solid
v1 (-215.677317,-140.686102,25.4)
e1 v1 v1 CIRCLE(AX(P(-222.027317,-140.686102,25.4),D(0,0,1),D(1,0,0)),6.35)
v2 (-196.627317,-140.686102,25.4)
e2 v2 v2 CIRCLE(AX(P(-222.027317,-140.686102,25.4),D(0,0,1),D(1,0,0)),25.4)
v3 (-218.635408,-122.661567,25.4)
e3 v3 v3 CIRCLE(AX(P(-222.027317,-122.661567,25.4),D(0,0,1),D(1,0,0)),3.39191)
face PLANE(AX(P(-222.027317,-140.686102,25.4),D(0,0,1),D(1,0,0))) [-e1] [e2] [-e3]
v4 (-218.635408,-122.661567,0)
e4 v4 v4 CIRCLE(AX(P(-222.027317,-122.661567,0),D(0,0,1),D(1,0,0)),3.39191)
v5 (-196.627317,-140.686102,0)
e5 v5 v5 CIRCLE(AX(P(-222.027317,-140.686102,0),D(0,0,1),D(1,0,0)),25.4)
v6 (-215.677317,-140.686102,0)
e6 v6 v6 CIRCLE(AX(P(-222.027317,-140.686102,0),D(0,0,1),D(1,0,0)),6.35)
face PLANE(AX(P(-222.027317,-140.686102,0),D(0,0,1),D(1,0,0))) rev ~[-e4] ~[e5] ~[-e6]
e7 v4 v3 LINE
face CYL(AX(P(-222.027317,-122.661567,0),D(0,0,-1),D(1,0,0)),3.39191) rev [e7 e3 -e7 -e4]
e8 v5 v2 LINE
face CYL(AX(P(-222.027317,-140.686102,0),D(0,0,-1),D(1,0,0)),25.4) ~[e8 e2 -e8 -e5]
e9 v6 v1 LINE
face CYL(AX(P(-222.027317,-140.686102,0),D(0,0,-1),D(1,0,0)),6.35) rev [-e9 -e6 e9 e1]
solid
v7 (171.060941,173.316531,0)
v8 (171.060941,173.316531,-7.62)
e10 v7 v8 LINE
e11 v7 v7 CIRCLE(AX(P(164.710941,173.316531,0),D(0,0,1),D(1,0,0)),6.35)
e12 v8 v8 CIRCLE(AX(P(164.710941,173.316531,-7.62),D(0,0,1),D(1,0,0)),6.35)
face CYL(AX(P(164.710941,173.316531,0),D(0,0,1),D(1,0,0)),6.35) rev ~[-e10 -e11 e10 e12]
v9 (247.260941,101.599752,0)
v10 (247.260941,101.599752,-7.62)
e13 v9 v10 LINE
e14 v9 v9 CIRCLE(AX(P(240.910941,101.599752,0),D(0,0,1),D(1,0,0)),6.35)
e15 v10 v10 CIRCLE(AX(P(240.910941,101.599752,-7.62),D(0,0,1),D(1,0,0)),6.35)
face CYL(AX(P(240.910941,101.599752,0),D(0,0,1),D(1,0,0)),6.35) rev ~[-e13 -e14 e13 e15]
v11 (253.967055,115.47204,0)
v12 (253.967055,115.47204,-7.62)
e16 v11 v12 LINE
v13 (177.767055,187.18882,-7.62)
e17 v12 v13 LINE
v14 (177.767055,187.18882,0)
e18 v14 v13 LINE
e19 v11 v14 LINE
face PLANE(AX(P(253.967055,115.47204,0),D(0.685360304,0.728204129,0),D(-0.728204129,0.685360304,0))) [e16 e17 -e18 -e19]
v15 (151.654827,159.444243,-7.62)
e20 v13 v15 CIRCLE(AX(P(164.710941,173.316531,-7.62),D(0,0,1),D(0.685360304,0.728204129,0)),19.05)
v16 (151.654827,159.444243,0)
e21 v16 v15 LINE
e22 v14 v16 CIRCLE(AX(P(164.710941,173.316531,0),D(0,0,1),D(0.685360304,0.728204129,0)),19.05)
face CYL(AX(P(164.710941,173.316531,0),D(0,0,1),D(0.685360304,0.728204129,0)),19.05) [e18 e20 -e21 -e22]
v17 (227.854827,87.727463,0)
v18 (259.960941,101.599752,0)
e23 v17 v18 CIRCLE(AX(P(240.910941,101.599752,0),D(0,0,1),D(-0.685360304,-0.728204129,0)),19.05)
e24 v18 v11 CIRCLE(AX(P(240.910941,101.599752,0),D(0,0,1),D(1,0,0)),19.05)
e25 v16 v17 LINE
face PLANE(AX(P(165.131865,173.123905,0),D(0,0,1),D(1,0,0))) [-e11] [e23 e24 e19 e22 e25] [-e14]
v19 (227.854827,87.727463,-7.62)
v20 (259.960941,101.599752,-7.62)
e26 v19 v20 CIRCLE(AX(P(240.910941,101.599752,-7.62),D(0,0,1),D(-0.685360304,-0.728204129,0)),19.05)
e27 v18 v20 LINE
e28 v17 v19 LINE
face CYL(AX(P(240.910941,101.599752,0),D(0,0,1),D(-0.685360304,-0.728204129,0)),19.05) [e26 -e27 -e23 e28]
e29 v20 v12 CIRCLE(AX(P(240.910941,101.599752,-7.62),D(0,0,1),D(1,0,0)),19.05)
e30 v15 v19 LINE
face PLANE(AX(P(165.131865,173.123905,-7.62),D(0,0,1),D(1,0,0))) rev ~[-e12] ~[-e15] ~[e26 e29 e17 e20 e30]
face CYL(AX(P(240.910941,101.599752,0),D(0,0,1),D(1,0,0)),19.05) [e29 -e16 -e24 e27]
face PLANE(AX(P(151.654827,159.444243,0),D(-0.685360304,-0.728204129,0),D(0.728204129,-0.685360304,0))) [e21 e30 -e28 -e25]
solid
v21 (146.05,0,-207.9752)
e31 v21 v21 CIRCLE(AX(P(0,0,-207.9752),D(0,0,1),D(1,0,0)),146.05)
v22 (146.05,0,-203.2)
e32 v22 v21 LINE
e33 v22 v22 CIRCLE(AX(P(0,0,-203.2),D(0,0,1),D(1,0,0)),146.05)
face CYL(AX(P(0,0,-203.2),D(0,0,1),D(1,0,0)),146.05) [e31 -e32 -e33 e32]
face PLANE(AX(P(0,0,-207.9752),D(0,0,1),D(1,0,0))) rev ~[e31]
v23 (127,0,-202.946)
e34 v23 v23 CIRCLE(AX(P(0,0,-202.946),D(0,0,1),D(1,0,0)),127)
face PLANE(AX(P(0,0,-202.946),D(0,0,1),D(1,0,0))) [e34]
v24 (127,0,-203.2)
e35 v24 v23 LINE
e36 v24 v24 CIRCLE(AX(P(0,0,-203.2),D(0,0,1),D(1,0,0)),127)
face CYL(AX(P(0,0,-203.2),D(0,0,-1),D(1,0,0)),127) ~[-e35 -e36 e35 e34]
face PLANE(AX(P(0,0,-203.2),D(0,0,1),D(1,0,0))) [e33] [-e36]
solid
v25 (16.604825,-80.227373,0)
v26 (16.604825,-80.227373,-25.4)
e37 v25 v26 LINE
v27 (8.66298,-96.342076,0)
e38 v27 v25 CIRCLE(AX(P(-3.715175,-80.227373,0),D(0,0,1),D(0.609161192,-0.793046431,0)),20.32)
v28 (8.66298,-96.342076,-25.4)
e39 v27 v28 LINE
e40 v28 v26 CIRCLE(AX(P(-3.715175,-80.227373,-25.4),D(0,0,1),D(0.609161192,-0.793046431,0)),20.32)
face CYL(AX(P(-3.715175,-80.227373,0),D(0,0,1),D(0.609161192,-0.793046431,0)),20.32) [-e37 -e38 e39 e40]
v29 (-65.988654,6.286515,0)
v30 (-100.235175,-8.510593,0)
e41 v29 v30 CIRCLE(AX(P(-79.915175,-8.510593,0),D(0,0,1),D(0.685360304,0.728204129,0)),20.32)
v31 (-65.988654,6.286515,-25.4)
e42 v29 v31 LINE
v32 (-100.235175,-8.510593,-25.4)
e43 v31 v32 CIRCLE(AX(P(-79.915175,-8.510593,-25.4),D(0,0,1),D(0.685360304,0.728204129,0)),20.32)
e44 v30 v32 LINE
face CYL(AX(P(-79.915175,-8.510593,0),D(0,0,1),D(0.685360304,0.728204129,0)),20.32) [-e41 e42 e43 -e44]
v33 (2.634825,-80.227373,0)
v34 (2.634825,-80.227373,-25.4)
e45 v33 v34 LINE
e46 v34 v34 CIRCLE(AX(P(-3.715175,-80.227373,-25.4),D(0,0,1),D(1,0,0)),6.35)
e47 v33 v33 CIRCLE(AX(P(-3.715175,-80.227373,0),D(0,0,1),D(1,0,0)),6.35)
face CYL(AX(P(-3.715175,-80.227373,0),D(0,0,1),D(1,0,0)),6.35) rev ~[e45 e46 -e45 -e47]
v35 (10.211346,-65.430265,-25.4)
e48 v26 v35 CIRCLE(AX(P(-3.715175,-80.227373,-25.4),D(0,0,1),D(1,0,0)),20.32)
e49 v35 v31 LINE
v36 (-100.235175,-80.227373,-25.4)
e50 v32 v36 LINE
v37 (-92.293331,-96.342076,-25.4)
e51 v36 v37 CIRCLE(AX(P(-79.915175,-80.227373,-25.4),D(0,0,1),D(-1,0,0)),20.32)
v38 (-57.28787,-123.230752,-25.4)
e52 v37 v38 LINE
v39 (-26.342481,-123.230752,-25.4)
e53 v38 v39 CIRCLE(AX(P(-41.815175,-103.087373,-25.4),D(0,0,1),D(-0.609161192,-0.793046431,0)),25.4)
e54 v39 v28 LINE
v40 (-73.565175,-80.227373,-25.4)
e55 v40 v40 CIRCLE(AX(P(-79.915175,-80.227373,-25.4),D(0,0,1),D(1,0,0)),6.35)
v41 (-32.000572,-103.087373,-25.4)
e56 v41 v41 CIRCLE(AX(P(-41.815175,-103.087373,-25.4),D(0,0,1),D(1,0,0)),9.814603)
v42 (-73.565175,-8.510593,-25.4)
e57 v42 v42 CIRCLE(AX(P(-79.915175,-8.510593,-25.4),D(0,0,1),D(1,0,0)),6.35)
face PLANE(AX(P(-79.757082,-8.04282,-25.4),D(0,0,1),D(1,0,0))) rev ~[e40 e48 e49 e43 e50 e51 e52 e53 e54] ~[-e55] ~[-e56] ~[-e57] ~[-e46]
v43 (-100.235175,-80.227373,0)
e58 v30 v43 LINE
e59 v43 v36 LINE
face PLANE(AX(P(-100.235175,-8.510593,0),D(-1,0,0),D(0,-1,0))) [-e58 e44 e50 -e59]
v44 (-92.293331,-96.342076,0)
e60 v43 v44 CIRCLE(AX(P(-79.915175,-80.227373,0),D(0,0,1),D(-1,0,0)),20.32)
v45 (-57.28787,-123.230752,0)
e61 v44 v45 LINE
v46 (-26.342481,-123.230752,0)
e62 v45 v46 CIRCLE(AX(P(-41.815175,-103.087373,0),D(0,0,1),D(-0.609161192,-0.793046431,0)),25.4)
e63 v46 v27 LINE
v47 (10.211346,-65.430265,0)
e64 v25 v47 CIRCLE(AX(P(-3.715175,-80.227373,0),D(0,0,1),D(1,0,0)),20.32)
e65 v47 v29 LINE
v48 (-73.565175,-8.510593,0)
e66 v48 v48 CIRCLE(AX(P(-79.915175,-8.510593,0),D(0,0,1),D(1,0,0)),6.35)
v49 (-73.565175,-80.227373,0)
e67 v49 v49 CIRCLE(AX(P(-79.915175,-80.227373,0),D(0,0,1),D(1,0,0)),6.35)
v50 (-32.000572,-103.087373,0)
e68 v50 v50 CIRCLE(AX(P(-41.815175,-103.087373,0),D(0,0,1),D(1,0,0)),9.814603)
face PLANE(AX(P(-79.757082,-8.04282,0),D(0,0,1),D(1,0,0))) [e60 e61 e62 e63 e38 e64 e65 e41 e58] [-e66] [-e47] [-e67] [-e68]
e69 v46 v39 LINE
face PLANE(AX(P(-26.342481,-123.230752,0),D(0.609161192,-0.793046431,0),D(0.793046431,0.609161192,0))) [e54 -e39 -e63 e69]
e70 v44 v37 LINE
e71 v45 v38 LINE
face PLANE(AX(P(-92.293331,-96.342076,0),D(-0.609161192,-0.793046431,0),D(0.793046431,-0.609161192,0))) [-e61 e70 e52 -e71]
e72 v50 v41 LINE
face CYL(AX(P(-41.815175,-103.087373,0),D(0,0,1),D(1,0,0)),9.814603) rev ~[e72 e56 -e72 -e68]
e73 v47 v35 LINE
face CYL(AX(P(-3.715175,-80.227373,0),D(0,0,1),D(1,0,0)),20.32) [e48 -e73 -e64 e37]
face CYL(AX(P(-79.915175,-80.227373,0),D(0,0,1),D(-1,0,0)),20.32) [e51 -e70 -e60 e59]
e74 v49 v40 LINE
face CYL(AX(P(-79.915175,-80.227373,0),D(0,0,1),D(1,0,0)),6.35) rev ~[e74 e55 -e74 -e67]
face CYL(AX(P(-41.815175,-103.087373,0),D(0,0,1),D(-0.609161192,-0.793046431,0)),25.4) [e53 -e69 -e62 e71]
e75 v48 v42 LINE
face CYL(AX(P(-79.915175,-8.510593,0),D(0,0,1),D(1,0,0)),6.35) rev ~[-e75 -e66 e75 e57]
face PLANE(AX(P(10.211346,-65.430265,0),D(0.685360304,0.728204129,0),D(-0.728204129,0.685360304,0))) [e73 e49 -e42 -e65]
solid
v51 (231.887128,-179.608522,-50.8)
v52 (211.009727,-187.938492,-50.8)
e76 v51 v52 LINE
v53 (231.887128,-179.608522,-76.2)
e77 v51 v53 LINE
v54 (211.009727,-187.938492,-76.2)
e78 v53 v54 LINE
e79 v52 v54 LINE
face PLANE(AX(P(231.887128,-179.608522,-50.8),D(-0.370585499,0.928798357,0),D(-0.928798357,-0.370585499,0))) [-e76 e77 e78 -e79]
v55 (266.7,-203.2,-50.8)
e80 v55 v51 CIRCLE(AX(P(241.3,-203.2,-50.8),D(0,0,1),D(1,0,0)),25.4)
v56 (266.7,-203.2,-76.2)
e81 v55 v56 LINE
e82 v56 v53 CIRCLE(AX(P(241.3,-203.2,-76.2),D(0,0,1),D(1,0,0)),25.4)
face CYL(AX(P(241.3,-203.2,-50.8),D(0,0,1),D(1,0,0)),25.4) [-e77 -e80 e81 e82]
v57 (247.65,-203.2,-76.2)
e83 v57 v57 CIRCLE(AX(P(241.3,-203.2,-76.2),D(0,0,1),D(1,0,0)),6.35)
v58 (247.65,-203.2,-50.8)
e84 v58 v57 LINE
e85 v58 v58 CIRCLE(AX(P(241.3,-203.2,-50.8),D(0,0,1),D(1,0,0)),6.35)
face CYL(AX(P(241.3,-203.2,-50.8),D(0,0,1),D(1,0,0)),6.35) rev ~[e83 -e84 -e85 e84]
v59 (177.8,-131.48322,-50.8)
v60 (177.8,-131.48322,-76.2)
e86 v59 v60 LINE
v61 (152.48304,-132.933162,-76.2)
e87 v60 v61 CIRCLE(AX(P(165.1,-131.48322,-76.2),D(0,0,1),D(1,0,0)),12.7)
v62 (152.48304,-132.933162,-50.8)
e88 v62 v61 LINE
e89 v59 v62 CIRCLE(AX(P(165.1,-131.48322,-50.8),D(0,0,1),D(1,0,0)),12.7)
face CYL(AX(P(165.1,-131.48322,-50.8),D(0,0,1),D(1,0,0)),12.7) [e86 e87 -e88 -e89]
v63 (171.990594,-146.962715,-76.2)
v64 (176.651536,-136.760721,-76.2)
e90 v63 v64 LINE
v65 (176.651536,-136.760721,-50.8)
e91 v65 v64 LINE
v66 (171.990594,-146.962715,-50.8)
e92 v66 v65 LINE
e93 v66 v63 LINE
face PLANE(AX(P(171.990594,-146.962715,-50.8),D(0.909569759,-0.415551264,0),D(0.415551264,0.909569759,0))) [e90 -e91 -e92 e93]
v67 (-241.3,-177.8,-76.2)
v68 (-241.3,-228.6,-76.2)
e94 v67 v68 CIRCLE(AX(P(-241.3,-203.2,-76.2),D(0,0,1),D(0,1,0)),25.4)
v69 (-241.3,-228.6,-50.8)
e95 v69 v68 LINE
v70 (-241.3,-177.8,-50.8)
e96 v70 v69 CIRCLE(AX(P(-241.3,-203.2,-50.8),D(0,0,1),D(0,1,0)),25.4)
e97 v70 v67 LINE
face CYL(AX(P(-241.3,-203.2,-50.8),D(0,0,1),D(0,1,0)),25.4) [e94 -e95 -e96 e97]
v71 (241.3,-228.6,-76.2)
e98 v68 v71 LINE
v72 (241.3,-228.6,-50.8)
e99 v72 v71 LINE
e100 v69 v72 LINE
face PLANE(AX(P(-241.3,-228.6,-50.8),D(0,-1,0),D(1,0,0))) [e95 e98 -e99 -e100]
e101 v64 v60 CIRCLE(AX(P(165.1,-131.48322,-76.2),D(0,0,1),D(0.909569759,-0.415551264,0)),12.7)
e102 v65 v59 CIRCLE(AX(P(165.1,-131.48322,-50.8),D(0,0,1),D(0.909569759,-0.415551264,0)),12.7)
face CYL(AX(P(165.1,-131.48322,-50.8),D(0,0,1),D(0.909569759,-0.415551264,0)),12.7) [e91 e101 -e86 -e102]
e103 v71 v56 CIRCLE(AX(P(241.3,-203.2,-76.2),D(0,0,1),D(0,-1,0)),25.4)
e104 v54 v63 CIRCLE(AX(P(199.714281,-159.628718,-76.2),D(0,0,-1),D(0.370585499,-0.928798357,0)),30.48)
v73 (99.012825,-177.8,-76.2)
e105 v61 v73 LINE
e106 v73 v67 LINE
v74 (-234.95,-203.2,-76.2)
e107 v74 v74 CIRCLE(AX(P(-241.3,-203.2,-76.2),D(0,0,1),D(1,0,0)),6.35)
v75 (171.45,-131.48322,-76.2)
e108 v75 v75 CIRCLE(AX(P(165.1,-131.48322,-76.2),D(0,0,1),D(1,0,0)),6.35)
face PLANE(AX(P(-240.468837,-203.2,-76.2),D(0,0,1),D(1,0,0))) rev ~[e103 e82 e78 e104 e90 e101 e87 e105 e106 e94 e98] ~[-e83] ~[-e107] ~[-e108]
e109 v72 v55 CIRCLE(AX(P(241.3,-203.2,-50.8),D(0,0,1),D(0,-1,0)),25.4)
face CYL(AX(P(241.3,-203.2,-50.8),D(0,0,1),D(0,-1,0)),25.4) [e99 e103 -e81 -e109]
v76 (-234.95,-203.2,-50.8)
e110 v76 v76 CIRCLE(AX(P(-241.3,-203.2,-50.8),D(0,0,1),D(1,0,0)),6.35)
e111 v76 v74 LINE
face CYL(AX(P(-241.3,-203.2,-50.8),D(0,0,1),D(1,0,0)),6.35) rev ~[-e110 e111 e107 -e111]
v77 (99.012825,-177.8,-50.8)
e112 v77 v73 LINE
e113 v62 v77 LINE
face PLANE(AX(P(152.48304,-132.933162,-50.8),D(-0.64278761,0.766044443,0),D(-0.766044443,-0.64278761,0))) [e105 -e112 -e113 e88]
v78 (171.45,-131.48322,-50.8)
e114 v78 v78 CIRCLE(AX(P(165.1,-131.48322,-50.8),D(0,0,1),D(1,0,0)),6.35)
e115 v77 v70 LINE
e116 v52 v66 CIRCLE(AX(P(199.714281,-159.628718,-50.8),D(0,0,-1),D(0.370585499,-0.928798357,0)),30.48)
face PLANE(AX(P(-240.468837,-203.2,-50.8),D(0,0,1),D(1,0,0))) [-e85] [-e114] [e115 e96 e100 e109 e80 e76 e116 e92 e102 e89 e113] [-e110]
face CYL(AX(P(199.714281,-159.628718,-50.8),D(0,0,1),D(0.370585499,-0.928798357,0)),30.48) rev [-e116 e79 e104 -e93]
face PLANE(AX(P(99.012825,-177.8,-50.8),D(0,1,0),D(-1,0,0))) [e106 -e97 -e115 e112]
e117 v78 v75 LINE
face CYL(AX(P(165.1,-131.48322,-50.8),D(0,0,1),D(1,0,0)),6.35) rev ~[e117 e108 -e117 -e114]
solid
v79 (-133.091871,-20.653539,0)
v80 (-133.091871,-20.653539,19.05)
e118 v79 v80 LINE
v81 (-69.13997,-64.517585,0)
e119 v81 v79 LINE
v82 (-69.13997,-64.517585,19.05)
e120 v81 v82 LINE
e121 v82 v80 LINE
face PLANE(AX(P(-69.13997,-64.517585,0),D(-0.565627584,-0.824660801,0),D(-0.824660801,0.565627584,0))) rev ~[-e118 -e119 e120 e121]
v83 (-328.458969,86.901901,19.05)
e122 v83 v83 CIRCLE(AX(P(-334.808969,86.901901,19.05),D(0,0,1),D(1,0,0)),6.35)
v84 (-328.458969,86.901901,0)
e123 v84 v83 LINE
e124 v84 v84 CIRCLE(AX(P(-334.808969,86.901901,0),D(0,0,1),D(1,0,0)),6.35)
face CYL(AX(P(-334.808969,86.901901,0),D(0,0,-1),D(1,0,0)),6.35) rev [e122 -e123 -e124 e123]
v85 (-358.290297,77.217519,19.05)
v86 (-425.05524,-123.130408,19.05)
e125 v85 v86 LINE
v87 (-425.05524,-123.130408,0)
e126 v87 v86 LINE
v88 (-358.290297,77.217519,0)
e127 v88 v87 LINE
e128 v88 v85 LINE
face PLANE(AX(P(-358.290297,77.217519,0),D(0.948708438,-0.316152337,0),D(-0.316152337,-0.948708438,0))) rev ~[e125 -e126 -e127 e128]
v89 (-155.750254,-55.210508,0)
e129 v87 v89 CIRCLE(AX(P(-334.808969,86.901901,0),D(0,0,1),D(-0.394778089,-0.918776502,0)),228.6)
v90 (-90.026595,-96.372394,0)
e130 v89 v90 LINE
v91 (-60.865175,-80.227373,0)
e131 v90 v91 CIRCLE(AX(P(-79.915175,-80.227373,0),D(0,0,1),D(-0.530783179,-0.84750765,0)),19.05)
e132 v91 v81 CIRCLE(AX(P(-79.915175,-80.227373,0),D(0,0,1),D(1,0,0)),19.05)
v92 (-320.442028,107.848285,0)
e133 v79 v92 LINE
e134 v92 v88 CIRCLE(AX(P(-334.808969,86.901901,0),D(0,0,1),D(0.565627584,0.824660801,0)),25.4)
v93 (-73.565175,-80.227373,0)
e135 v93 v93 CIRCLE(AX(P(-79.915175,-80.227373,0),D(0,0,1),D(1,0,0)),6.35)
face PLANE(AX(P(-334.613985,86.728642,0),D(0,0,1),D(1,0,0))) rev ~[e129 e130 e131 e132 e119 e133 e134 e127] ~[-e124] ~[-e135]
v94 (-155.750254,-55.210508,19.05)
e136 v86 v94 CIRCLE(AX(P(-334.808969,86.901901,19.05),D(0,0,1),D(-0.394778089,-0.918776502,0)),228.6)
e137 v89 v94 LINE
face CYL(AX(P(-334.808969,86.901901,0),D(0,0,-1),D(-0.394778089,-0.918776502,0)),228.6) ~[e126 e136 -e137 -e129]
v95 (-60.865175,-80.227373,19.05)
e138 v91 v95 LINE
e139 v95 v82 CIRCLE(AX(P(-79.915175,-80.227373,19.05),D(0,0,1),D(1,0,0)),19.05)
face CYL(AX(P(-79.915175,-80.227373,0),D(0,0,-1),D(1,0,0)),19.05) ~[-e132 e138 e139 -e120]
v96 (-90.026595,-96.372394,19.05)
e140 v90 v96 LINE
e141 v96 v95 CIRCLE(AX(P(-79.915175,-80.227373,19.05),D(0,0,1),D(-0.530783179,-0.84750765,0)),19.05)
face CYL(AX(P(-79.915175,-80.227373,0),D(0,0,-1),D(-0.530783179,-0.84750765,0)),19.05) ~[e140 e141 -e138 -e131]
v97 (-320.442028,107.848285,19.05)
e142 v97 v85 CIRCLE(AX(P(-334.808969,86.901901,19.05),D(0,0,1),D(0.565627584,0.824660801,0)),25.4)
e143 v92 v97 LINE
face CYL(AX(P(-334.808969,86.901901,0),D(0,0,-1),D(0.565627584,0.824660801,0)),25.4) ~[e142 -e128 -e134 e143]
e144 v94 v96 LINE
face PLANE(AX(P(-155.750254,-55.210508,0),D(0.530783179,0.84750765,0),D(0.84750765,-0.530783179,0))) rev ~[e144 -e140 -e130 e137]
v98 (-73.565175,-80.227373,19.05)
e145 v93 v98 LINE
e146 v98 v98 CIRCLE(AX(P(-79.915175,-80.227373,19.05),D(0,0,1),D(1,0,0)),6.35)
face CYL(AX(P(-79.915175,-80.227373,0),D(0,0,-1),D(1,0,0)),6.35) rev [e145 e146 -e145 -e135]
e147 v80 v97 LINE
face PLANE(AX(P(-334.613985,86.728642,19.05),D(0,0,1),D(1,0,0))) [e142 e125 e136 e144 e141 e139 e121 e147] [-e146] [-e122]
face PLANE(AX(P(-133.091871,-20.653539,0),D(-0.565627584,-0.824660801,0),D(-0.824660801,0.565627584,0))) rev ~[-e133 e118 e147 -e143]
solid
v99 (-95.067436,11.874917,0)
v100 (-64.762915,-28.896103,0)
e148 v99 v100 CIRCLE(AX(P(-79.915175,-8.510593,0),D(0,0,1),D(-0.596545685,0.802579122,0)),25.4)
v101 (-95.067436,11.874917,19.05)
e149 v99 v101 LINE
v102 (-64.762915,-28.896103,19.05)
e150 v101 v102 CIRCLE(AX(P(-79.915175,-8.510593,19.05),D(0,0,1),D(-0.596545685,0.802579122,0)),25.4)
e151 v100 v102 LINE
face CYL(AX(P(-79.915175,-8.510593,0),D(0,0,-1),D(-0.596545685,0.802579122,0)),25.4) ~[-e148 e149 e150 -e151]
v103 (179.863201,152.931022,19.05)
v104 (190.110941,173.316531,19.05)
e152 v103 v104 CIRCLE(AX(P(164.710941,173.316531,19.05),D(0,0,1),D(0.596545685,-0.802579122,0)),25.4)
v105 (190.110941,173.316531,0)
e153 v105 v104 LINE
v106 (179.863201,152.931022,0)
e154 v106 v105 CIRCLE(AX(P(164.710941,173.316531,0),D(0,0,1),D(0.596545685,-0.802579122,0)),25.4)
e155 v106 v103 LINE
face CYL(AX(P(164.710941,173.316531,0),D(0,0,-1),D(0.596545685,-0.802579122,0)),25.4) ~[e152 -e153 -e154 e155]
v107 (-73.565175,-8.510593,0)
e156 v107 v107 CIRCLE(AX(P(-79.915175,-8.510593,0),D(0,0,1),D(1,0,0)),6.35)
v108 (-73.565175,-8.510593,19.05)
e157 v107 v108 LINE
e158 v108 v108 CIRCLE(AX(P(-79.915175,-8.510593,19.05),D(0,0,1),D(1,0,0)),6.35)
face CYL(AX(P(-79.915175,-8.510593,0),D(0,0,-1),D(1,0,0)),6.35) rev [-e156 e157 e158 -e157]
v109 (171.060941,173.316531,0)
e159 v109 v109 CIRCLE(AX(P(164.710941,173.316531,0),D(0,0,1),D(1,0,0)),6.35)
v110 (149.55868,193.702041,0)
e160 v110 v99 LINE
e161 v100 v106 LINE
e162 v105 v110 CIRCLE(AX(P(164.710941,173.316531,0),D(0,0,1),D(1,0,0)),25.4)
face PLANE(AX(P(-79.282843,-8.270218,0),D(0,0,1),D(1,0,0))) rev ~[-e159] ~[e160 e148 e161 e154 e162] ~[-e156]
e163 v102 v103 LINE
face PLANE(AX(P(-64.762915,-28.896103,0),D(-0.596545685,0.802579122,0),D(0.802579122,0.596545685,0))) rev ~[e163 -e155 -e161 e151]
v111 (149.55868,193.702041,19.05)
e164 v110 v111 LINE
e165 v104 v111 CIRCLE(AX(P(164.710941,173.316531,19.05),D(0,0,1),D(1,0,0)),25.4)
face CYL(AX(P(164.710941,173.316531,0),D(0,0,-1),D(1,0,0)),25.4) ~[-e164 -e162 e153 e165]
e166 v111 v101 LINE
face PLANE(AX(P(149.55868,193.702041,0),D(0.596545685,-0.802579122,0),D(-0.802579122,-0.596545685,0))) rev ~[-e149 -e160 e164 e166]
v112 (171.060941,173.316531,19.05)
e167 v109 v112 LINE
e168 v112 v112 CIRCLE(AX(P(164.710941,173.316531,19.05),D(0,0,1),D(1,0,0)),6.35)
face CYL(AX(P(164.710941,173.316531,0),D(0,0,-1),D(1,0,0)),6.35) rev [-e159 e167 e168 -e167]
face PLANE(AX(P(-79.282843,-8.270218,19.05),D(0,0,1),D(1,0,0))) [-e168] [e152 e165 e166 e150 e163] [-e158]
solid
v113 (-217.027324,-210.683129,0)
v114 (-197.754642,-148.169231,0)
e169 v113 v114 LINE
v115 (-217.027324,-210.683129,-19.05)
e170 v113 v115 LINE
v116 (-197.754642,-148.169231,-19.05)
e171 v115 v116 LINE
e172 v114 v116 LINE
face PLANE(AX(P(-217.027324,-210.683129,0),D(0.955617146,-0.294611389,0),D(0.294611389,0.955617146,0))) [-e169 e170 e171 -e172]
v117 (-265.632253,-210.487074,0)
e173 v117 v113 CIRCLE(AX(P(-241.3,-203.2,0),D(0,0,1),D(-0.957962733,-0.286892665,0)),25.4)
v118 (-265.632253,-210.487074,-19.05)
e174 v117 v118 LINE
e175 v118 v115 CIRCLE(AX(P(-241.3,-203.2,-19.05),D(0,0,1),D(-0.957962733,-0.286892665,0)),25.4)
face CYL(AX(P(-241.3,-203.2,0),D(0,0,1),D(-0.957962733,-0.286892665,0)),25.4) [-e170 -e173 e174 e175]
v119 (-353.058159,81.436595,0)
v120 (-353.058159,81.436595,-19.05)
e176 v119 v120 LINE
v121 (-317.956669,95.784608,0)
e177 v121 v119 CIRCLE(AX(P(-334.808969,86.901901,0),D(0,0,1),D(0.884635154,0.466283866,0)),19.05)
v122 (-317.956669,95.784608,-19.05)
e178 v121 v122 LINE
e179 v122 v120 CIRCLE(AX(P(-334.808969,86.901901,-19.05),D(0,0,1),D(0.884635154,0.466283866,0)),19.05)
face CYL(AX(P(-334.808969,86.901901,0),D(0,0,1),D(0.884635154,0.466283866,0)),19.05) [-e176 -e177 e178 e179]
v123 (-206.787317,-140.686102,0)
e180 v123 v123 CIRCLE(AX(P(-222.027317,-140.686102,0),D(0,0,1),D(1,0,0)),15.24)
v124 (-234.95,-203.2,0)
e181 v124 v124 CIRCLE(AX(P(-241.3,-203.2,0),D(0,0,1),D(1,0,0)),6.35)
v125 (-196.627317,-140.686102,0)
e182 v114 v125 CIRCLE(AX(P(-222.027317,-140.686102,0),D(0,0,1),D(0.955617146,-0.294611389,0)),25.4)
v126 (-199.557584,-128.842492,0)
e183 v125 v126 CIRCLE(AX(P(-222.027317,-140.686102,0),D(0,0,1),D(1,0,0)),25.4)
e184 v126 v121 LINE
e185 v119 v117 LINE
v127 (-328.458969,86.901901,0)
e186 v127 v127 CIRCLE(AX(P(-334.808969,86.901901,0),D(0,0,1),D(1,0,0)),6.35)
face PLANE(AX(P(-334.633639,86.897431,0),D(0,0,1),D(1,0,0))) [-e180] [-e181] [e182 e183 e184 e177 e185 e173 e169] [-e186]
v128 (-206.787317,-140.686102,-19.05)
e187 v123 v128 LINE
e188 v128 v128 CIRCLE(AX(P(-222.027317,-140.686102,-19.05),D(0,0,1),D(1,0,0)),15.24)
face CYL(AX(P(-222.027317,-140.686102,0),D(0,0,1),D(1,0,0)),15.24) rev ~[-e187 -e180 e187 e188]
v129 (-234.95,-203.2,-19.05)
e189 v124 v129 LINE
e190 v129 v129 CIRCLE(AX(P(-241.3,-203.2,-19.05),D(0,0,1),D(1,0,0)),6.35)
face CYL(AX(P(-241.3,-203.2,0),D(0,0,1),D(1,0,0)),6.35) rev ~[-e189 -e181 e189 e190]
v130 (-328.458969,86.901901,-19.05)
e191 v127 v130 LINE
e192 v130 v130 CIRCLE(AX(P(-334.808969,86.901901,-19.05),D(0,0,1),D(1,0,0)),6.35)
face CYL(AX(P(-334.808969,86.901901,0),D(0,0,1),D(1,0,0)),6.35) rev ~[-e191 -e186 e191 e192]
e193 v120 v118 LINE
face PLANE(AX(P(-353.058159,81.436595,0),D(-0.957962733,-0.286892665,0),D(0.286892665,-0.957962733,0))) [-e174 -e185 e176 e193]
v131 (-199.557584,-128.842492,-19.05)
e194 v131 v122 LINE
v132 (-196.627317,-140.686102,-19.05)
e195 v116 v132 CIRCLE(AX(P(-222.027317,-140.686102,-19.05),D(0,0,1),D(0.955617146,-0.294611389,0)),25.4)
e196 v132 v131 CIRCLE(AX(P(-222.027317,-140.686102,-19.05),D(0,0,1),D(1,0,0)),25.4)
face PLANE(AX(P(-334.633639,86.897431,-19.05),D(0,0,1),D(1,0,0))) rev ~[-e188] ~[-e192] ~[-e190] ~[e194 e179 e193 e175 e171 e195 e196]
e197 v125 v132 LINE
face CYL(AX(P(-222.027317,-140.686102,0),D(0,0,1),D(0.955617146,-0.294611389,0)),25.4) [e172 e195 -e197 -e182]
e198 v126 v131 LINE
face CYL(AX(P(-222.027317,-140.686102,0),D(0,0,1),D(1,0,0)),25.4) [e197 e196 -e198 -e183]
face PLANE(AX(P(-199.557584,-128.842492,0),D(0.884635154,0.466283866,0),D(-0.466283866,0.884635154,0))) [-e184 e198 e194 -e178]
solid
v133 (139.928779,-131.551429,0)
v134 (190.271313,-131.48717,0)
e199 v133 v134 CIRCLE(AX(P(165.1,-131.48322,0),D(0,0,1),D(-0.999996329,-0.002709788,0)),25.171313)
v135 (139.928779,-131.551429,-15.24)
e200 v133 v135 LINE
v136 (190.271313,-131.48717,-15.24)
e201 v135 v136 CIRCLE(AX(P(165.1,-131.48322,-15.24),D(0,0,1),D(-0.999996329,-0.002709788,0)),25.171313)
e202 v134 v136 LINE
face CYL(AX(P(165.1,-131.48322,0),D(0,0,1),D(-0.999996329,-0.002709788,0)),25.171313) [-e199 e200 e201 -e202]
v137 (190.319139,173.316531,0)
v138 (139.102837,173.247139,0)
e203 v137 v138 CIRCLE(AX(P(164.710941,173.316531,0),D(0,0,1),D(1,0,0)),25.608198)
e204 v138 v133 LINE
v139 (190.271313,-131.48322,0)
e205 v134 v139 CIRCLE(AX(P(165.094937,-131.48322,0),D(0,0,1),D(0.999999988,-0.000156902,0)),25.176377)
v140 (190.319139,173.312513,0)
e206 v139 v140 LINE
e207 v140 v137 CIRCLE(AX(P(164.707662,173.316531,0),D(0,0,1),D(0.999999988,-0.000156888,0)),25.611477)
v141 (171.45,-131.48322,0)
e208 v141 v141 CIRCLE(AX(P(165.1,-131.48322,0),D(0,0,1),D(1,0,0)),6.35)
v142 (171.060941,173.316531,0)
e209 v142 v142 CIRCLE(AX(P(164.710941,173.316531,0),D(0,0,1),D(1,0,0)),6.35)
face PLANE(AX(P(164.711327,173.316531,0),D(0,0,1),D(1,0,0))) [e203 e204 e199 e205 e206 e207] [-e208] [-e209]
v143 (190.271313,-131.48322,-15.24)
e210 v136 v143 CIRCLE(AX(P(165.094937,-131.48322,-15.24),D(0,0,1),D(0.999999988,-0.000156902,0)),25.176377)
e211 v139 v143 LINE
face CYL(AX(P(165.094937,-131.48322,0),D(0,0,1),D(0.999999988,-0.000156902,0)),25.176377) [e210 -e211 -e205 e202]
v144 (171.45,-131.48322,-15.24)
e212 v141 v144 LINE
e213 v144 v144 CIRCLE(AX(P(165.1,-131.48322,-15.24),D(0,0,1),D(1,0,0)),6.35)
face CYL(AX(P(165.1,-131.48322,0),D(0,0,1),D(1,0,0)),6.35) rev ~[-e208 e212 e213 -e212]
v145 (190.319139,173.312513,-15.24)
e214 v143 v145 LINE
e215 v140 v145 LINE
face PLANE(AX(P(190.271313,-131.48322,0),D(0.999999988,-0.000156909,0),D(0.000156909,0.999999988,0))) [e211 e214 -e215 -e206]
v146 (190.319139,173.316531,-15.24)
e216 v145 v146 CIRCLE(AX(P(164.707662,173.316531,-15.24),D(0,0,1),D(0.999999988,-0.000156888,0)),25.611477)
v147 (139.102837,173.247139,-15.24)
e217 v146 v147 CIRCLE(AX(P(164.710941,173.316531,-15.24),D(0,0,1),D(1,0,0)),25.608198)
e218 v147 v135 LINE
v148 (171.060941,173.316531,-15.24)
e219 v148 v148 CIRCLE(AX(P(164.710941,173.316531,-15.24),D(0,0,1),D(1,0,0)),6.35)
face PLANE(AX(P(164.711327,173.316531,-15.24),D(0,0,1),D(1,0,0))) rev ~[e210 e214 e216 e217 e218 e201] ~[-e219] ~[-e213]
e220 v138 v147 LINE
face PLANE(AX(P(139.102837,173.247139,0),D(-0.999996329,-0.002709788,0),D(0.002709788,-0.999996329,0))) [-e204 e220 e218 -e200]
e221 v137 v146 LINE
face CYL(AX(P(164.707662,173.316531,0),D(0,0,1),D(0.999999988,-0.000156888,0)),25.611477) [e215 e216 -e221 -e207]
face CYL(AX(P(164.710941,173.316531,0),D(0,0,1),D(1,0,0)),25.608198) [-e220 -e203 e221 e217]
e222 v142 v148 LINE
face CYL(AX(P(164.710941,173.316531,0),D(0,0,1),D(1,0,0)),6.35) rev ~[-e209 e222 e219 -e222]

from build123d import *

# Parameters (mm, degrees)
F1_R      = 6.35
F2_DEPTH  = 19.05
F3_R      = 6.35
F3_R_2    = 15.24
F4_DEPTH  = 19.05
F5_R      = 25.4
F5_R_2    = 3.391909558
F5_R_3    = 6.35
F6_DEPTH  = 25.4
F7_R      = 6.35
F7_R_2    = 9.8146033801
F8_DEPTH  = 25.4
F10_R     = 6.35
F11_DEPTH = 25.4
F12_R     = 6.35
F13_DEPTH = 19.05
F14_R     = 6.35
F15_DEPTH = 15.24
F16_R     = 6.35
F17_DEPTH = 7.62
F19_R     = 146.05
F19_R_2   = 127
F20_DEPTH = 4.7752
F21_DEPTH = 0.254


# Not quite as in the source:
# - ends of sketch curves that miss each other by under 0.0002 mm in the source are joined


with BuildPart() as f2:
    # F1 (on Top) → F2 (new body)
    with BuildSketch(Plane.XY):
        with BuildLine():
            ThreePointArc((-348.2908615979, 65.3752063053), (-322.5061251941, 64.6802886665), (-309.4089688568, 86.90190062))
            ThreePointArc((-309.4089688568, 86.90190062), (-312.3358705821, 98.7391238559), (-320.4420282219, 107.848284957))
            ThreePointArc((-320.4420282219, 107.848284957), (-350.787985368, 106.6460397842), (-358.2902966075, 77.2175190155))
            ThreePointArc((-358.2902966075, 77.2175190155), (-354.2159266262, 70.5150159211), (-348.2908615979, 65.3752063053))
        make_face()
        with Locations((-334.8089688568, 86.90190062)):
            Circle(F1_R, mode=Mode.SUBTRACT)
        with BuildLine():
            ThreePointArc((-320.4420282219, 107.848284957), (-312.3358705821, 98.7391238559), (-309.4089688568, 86.90190062))
            ThreePointArc((-309.4089688568, 86.90190062), (-322.5061251941, 64.6802886665), (-348.2908615979, 65.3752063053))
            Line((-348.2908615979, 65.3752063053), (-155.7502543241, -55.2105082327))
            ThreePointArc((-155.7502543241, -55.2105082327), (-143.6386238017, -38.4450545545), (-133.0918711804, -20.6535385963))
            Line((-133.0918711804, -20.6535385963), (-320.4420282219, 107.848284957))
        make_face()
        with BuildLine():
            Line((-69.1399699738, -64.5175846932), (-133.0918711804, -20.6535385963))
            ThreePointArc((-133.0918711804, -20.6535385963), (-143.6386238017, -38.4450545545), (-155.7502543241, -55.2105082327))
            Line((-155.7502543241, -55.2105082327), (-90.0265950058, -96.372393682))
            ThreePointArc((-90.0265950058, -96.372393682), (-95.8460375379, -69.7817933481), (-69.1399699738, -64.5175846932))
        make_face()
        with BuildLine():
            ThreePointArc((-60.86517545, -80.227372946), (-63.060351744, -71.3494555191), (-69.1399699738, -64.5175846932))
            ThreePointArc((-69.1399699738, -64.5175846932), (-95.8460375379, -69.7817933481), (-90.0265950058, -96.372393682))
            ThreePointArc((-90.0265950058, -96.372393682), (-70.688042703, -96.8935819111), (-60.86517545, -80.227372946))
        make_face()
        with Locations((-79.91517545, -80.227372946)):
            Circle(F1_R, mode=Mode.SUBTRACT)
        with BuildLine():
            Line((-155.7502543241, -55.2105082327), (-348.2908615979, 65.3752063053))
            ThreePointArc((-348.2908615979, 65.3752063053), (-354.2159266262, 70.5150159211), (-358.2902966075, 77.2175190155))
            Line((-358.2902966075, 77.2175190155), (-425.0552400863, -123.1304076784))
            ThreePointArc((-425.0552400863, -123.1304076784), (-278.9055637141, -134.7572279839), (-155.7502543241, -55.2105082327))
        make_face()
    extrude(amount=F2_DEPTH)


with BuildPart() as f4:
    # F3 (on Top) → F4 (new body)
    with BuildSketch(Plane.XY):
        with BuildLine():
            ThreePointArc((-353.0581589295, 81.4365953504), (-332.0471371173, 68.0531663006), (-315.7589688568, 86.90190062))
            ThreePointArc((-315.7589688568, 86.90190062), (-316.3165540739, 91.4771706117), (-317.9566691714, 95.7846082767))
            ThreePointArc((-317.9566691714, 95.7846082767), (-342.0168946626, 104.5356269868), (-353.0581589295, 81.4365953504))
        make_face()
        with Locations((-334.8089688568, 86.90190062)):
            Circle(F3_R, mode=Mode.SUBTRACT)
        with BuildLine():
            ThreePointArc((-317.9566691714, 95.7846082767), (-316.3165540739, 91.4771706117), (-315.7589688568, 86.90190062))
            ThreePointArc((-315.7589688568, 86.90190062), (-332.0471371173, 68.0531663006), (-353.0581589295, 81.4365953504))
            Line((-353.0581589295, 81.4365953504), (-265.6322534303, -210.4870736928))
            ThreePointArc((-265.6322534303, -210.4870736928), (-244.9824423193, -178.0683542408), (-215.9, -203.2))
            ThreePointArc((-215.9, -203.2), (-216.1834122755, -206.9837839628), (-217.0273244943, -210.6831292782))
            Line((-217.0273244943, -210.6831292782), (-197.7546415567, -148.1692314583))
            ThreePointArc((-197.7546415567, -148.1692314583), (-247.3175108343, -143.0453603229), (-199.5575841486, -128.8424919711))
            Line((-199.5575841486, -128.8424919711), (-317.9566691714, 95.7846082767))
        make_face()
        with BuildLine():
            ThreePointArc((-196.6273170625, -140.6861021801), (-197.3707640186, -134.5857421912), (-199.5575841486, -128.8424919711))
            ThreePointArc((-199.5575841486, -128.8424919711), (-247.3175108343, -143.0453603229), (-197.7546415567, -148.1692314583))
            ThreePointArc((-197.7546415567, -148.1692314583), (-196.9107293379, -144.4698861429), (-196.6273170625, -140.6861021801))
        make_face()
        with Locations((-222.0273170625, -140.6861021801)):
            Circle(F3_R_2, mode=Mode.SUBTRACT)
        with BuildLine():
            ThreePointArc((-215.9, -203.2), (-244.9824423193, -178.0683542408), (-265.6322534303, -210.4870736928))
            ThreePointArc((-265.6322534303, -210.4870736928), (-241.4024540405, -228.5997933686), (-217.0273244943, -210.6831292782))
            ThreePointArc((-217.0273244943, -210.6831292782), (-216.1834122755, -206.9837839628), (-215.9, -203.2))
        make_face()
        with Locations((-241.3, -203.2)):
            Circle(F3_R, mode=Mode.SUBTRACT)
    extrude(amount=-F4_DEPTH)


with BuildPart() as f6:
    # F5 (on Top) → F6 (new body)
    with BuildSketch(Plane.XY):
        with Locations((-222.0273170625, -140.6861021801)):
            Circle(F5_R)
        with Locations((-222.0273170625, -122.6615665425)):
            Circle(F5_R_2, mode=Mode.SUBTRACT)
        with Locations((-222.0273170625, -140.6861021801)):
            Circle(F5_R_3, mode=Mode.SUBTRACT)
    extrude(amount=F6_DEPTH)


with BuildPart() as f8:
    # F7 (on Top) → F8 (new body)
    with BuildSketch(Plane.XY):
        with BuildLine():
            ThreePointArc((-100.23517545, -8.5105931449), (-79.91517545, -28.8305931449), (-59.59517545, -8.5105931449))
            ThreePointArc((-59.59517545, -8.5105931449), (-61.2619007451, -0.4509565039), (-65.9886540706, 6.2865147573))
            ThreePointArc((-65.9886540706, 6.2865147573), (-87.974812091, 10.14268156), (-100.23517545, -8.5105931449))
        make_face()
        with Locations((-79.91517545, -8.5105931449)):
            Circle(F7_R, mode=Mode.SUBTRACT)
        with BuildLine():
            ThreePointArc((-65.9886540706, 6.2865147573), (-61.2619007451, -0.4509565039), (-59.59517545, -8.5105931449))
            ThreePointArc((-59.59517545, -8.5105931449), (-79.91517545, -28.8305931449), (-100.23517545, -8.5105931449))
            Line((-100.23517545, -8.5105931449), (-100.23517545, -80.227372946))
            ThreePointArc((-100.23517545, -80.227372946), (-79.91517545, -59.907372946), (-59.59517545, -80.227372946))
            ThreePointArc((-59.59517545, -80.227372946), (-59.7853586301, -83.0009761617), (-60.3523481664, -85.7226608066))
            ThreePointArc((-60.3523481664, -85.7226608066), (-41.81517545, -77.687372946), (-23.2780027336, -85.7226608066))
            ThreePointArc((-23.2780027336, -85.7226608066), (-14.2454801707, -62.8487918045), (10.2113459294, -65.4302650438))
            Line((10.2113459294, -65.4302650438), (-65.9886540706, 6.2865147573))
        make_face()
        with BuildLine():
            ThreePointArc((-65.8603556748, -94.9026733207), (-78.8102903137, -100.5173120498), (-92.2933308728, -96.3420764285))
            Line((-92.2933308728, -96.3420764285), (-57.2878697285, -123.2307522991))
            ThreePointArc((-57.2878697285, -123.2307522991), (-66.1263995238, -110.4443005678), (-65.8603556748, -94.9026733207))
        make_face()
        with BuildLine():
            ThreePointArc((-59.59517545, -80.227372946), (-79.91517545, -59.907372946), (-100.23517545, -80.227372946))
            ThreePointArc((-100.23517545, -80.227372946), (-98.1418937255, -89.2100863948), (-92.2933308728, -96.3420764285))
            ThreePointArc((-92.2933308728, -96.3420764285), (-78.8102903137, -100.5173120498), (-65.8603556748, -94.9026733207))
            ThreePointArc((-65.8603556748, -94.9026733207), (-63.5954957631, -90.0191807581), (-60.3523481664, -85.7226608066))
            ThreePointArc((-60.3523481664, -85.7226608066), (-59.7853586301, -83.0009761617), (-59.59517545, -80.227372946))
        make_face()
        with Locations((-79.91517545, -80.227372946)):
            Circle(F7_R, mode=Mode.SUBTRACT)
        with BuildLine():
            ThreePointArc((-17.7699952252, -94.9026733207), (-21.1394317005, -90.6819266963), (-23.2780027336, -85.7226608066))
            ThreePointArc((-23.2780027336, -85.7226608066), (-41.81517545, -77.687372946), (-60.3523481664, -85.7226608066))
            ThreePointArc((-60.3523481664, -85.7226608066), (-62.4909191995, -90.6819266963), (-65.8603556748, -94.9026733207))
            ThreePointArc((-65.8603556748, -94.9026733207), (-66.1263995238, -110.4443005678), (-57.2878697285, -123.2307522991))
            ThreePointArc((-57.2878697285, -123.2307522991), (-41.81517545, -128.487372946), (-26.3424811715, -123.2307522991))
            ThreePointArc((-26.3424811715, -123.2307522991), (-19.0317776056, -114.3157647571), (-16.41517545, -103.087372946))
            ThreePointArc((-16.41517545, -103.087372946), (-16.7561693074, -98.9393359229), (-17.7699952252, -94.9026733207))
        make_face()
        with Locations((-41.81517545, -103.087372946)):
            Circle(F7_R_2, mode=Mode.SUBTRACT)
        with BuildLine():
            ThreePointArc((-65.8603556748, -94.9026733207), (-62.4909191995, -90.6819266963), (-60.3523481664, -85.7226608066))
            ThreePointArc((-60.3523481664, -85.7226608066), (-63.5954957631, -90.0191807581), (-65.8603556748, -94.9026733207))
        make_face()
        with BuildLine():
            ThreePointArc((-17.7699952252, -94.9026733207), (-20.0348551369, -90.0191807581), (-23.2780027336, -85.7226608066))
            ThreePointArc((-23.2780027336, -85.7226608066), (-21.1394317005, -90.6819266963), (-17.7699952252, -94.9026733207))
        make_face()
        with BuildLine():
            ThreePointArc((16.60482455, -80.227372946), (14.9380992549, -72.167736305), (10.2113459294, -65.4302650438))
            ThreePointArc((10.2113459294, -65.4302650438), (-14.2454801707, -62.8487918045), (-23.2780027336, -85.7226608066))
            ThreePointArc((-23.2780027336, -85.7226608066), (-20.0348551369, -90.0191807581), (-17.7699952252, -94.9026733207))
            ThreePointArc((-17.7699952252, -94.9026733207), (-4.8200605863, -100.5173120498), (8.6629799728, -96.3420764285))
            ThreePointArc((8.6629799728, -96.3420764285), (14.5115428255, -89.2100863948), (16.60482455, -80.227372946))
        make_face()
        with Locations((-3.71517545, -80.227372946)):
            Circle(F7_R, mode=Mode.SUBTRACT)
        with BuildLine():
            Line((-26.3424811715, -123.2307522991), (8.6629799728, -96.3420764285))
            ThreePointArc((8.6629799728, -96.3420764285), (-4.8200605863, -100.5173120498), (-17.7699952252, -94.9026733207))
            ThreePointArc((-17.7699952252, -94.9026733207), (-16.7561693074, -98.9393359229), (-16.41517545, -103.087372946))
            ThreePointArc((-16.41517545, -103.087372946), (-19.0317776056, -114.3157647571), (-26.3424811715, -123.2307522991))
        make_face()
    extrude(amount=-F8_DEPTH)


with BuildPart() as f11:
    # F10 (on offset) → F11 (new body)
    with BuildSketch(Plane.XY.offset(-50.8)):
        with BuildLine():
            ThreePointArc((-241.3, -228.6), (-223.3394877579, -221.1605122421), (-215.9, -203.2))
            ThreePointArc((-215.9, -203.2), (-223.3394877579, -185.2394877579), (-241.3, -177.8))
            ThreePointArc((-241.3, -177.8), (-266.7, -203.2), (-241.3, -228.6))
        make_face()
        with Locations((-241.3, -203.2)):
            Circle(F10_R, mode=Mode.SUBTRACT)
        with BuildLine():
            ThreePointArc((-241.3, -177.8), (-223.3394877579, -185.2394877579), (-215.9, -203.2))
            ThreePointArc((-215.9, -203.2), (-223.3394877579, -221.1605122421), (-241.3, -228.6))
            Line((-241.3, -228.6), (241.3, -228.6))
            ThreePointArc((241.3, -228.6), (216.3562277503, -207.9925177054), (231.8871283349, -179.6085217289))
            Line((231.8871283349, -179.6085217289), (211.0097267055, -187.9384915587))
            ThreePointArc((211.0097267055, -187.9384915587), (177.641099394, -180.6478771481), (171.9905944387, -146.9627151196))
            Line((171.9905944387, -146.9627151196), (176.6515359453, -136.7607212463))
            ThreePointArc((176.6515359453, -136.7607212463), (163.11346164, -144.0268905287), (152.4830404112, -132.9331618302))
            Line((152.4830404112, -132.9331618302), (99.012824834, -177.8))
            Line((99.012824834, -177.8), (-241.3, -177.8))
        make_face()
        with BuildLine():
            ThreePointArc((177.8, -131.4832201989), (164.3738411943, -118.8039972973), (152.4830404112, -132.9331618302))
            ThreePointArc((152.4830404112, -132.9331618302), (163.11346164, -144.0268905287), (176.6515359453, -136.7607212463))
            ThreePointArc((176.6515359453, -136.7607212463), (177.5095629759, -134.1837288079), (177.8, -131.4832201989))
        make_face()
        with Locations((165.1, -131.4832201989)):
            Circle(F10_R, mode=Mode.SUBTRACT)
        with BuildLine():
            ThreePointArc((231.8871283349, -179.6085217289), (216.3562277503, -207.9925177054), (241.3, -228.6))
            ThreePointArc((241.3, -228.6), (259.2605122421, -221.1605122421), (266.7, -203.2))
            ThreePointArc((266.7, -203.2), (255.5490887376, -182.1732677254), (231.8871283349, -179.6085217289))
        make_face()
        with Locations((241.3, -203.2)):
            Circle(F10_R, mode=Mode.SUBTRACT)
    extrude(amount=-F11_DEPTH)


with BuildPart() as f13:
    # F12 (on Top) → F13 (new body)
    with BuildSketch(Plane.XY):
        with BuildLine():
            ThreePointArc((-64.7629150633, -28.8961028313), (-57.2212620169, -19.9187609684), (-54.51517545, -8.5105931449))
            ThreePointArc((-54.51517545, -8.5105931449), (-68.5070076265, 14.1833202883), (-95.0674358367, 11.8749165415))
            ThreePointArc((-95.0674358367, 11.8749165415), (-100.3006851364, -23.6628535316), (-64.7629150633, -28.8961028313))
        make_face()
        with Locations((-79.91517545, -8.5105931449)):
            Circle(F12_R, mode=Mode.SUBTRACT)
        with BuildLine():
            ThreePointArc((-95.0674358367, 11.8749165415), (-68.5070076265, 14.1833202883), (-54.51517545, -8.5105931449))
            ThreePointArc((-54.51517545, -8.5105931449), (-57.2212620169, -19.9187609684), (-64.7629150633, -28.8961028313))
            Line((-64.7629150633, -28.8961028313), (179.8632011733, 152.9310218091))
            ThreePointArc((179.8632011733, 152.9310218091), (144.3254311003, 158.1642711088), (149.5586804, 193.7020411818))
            Line((149.5586804, 193.7020411818), (-95.0674358367, 11.8749165415))
        make_face()
        with BuildLine():
            ThreePointArc((190.1109407867, 173.3165314954), (176.1191086101, 196.0104449286), (149.5586804, 193.7020411818))
            ThreePointArc((149.5586804, 193.7020411818), (144.3254311003, 158.1642711088), (179.8632011733, 152.9310218091))
            ThreePointArc((179.8632011733, 152.9310218091), (187.4048542198, 161.908363672), (190.1109407867, 173.3165314954))
        make_face()
        with Locations((164.7109407867, 173.3165314954)):
            Circle(F12_R, mode=Mode.SUBTRACT)
    extrude(amount=F13_DEPTH)


with BuildPart() as f15:
    # F14 (on Top) → F15 (new body)
    with BuildSketch(Plane.XY):
        with BuildLine():
            ThreePointArc((190.3191387149, 173.312513352), (190.3191389513, 173.3145224237), (190.3191390301, 173.3165314954))
            ThreePointArc((190.3191390301, 173.3165314954), (164.6762443628, 198.9247062339), (139.1028365632, 173.2471387114))
            ThreePointArc((139.1028365632, 173.2471387114), (164.7436281405, 147.7083541137), (190.3191387149, 173.312513352))
        make_face()
        with Locations((164.7109407867, 173.3165314954)):
            Circle(F14_R, mode=Mode.SUBTRACT)
        with BuildLine():
            ThreePointArc((190.3191387149, 173.312513352), (164.7436281405, 147.7083541137), (139.1028365632, 173.2471387114))
            Line((139.1028365632, 173.2471387114), (139.9287790463, -131.5514291176))
            ThreePointArc((139.9287790463, -131.5514291176), (165.0658955093, -106.3119299332), (190.2713133697, -131.4832201989))
            Line((190.2713133697, -131.4832201989), (190.3191387149, 173.312513352))
        make_face()
        with BuildLine():
            ThreePointArc((190.2713133697, -131.4832201989), (165.0658955093, -106.3119299332), (139.9287790463, -131.5514291176))
            ThreePointArc((139.9287790463, -131.5514291176), (165.1321296961, -156.6545130627), (190.2713130598, -131.4871697914))
            ThreePointArc((190.2713130598, -131.4871697914), (190.2713132922, -131.4851949951), (190.2713133697, -131.4832201989))
        make_face()
        with Locations((165.1, -131.4832201989)):
            Circle(F14_R, mode=Mode.SUBTRACT)
    extrude(amount=-F15_DEPTH)


with BuildPart() as f17:
    # F16 (on Top) → F17 (new body)
    with BuildSketch(Plane.XY):
        with BuildLine():
            ThreePointArc((151.6548269934, 159.4442428372), (172.2668501376, 155.8290864596), (183.7609407867, 173.3165314954))
            ThreePointArc((183.7609407867, 173.3165314954), (182.1983858225, 180.8724408464), (177.7670545799, 187.1888201537))
            ThreePointArc((177.7670545799, 187.1888201537), (150.8386521284, 186.3726452887), (151.6548269934, 159.4442428372))
        make_face()
        with Locations((164.7109407867, 173.3165314954)):
            Circle(F16_R, mode=Mode.SUBTRACT)
        with BuildLine():
            ThreePointArc((177.7670545799, 187.1888201537), (182.1983858225, 180.8724408464), (183.7609407867, 173.3165314954))
            ThreePointArc((183.7609407867, 173.3165314954), (172.2668501376, 155.8290864596), (151.6548269934, 159.4442428372))
            Line((151.6548269934, 159.4442428372), (227.8548269934, 87.7274630361))
            ThreePointArc((227.8548269934, 87.7274630361), (227.0386521284, 114.6558654876), (253.9670545799, 115.4720403526))
            Line((253.9670545799, 115.4720403526), (177.7670545799, 187.1888201537))
        make_face()
        with BuildLine():
            ThreePointArc((259.9609407867, 101.5997516943), (258.3983858225, 109.1556610453), (253.9670545799, 115.4720403526))
            ThreePointArc((253.9670545799, 115.4720403526), (227.0386521284, 114.6558654876), (227.8548269934, 87.7274630361))
            ThreePointArc((227.8548269934, 87.7274630361), (248.4668501376, 84.1123066585), (259.9609407867, 101.5997516943))
        make_face()
        with Locations((240.9109407867, 101.5997516943)):
            Circle(F16_R, mode=Mode.SUBTRACT)
    extrude(amount=-F17_DEPTH)


with BuildPart() as f20:
    # F19 (on offset) → F20 (new body)
    with BuildSketch(Plane.XY.offset(-203.2)):
        Circle(F19_R)
        Circle(F19_R_2, mode=Mode.SUBTRACT)
        Circle(F19_R_2)
    extrude(amount=-F20_DEPTH)

    # F19 (on offset) → F21 (join)
    with BuildSketch(Plane.XY.offset(-203.2)):
        Circle(F19_R_2)
    extrude(amount=F21_DEPTH)


solid = Compound([f2.part, f4.part, f6.part, f8.part, f11.part, f13.part, f15.part, f17.part, f20.part])
